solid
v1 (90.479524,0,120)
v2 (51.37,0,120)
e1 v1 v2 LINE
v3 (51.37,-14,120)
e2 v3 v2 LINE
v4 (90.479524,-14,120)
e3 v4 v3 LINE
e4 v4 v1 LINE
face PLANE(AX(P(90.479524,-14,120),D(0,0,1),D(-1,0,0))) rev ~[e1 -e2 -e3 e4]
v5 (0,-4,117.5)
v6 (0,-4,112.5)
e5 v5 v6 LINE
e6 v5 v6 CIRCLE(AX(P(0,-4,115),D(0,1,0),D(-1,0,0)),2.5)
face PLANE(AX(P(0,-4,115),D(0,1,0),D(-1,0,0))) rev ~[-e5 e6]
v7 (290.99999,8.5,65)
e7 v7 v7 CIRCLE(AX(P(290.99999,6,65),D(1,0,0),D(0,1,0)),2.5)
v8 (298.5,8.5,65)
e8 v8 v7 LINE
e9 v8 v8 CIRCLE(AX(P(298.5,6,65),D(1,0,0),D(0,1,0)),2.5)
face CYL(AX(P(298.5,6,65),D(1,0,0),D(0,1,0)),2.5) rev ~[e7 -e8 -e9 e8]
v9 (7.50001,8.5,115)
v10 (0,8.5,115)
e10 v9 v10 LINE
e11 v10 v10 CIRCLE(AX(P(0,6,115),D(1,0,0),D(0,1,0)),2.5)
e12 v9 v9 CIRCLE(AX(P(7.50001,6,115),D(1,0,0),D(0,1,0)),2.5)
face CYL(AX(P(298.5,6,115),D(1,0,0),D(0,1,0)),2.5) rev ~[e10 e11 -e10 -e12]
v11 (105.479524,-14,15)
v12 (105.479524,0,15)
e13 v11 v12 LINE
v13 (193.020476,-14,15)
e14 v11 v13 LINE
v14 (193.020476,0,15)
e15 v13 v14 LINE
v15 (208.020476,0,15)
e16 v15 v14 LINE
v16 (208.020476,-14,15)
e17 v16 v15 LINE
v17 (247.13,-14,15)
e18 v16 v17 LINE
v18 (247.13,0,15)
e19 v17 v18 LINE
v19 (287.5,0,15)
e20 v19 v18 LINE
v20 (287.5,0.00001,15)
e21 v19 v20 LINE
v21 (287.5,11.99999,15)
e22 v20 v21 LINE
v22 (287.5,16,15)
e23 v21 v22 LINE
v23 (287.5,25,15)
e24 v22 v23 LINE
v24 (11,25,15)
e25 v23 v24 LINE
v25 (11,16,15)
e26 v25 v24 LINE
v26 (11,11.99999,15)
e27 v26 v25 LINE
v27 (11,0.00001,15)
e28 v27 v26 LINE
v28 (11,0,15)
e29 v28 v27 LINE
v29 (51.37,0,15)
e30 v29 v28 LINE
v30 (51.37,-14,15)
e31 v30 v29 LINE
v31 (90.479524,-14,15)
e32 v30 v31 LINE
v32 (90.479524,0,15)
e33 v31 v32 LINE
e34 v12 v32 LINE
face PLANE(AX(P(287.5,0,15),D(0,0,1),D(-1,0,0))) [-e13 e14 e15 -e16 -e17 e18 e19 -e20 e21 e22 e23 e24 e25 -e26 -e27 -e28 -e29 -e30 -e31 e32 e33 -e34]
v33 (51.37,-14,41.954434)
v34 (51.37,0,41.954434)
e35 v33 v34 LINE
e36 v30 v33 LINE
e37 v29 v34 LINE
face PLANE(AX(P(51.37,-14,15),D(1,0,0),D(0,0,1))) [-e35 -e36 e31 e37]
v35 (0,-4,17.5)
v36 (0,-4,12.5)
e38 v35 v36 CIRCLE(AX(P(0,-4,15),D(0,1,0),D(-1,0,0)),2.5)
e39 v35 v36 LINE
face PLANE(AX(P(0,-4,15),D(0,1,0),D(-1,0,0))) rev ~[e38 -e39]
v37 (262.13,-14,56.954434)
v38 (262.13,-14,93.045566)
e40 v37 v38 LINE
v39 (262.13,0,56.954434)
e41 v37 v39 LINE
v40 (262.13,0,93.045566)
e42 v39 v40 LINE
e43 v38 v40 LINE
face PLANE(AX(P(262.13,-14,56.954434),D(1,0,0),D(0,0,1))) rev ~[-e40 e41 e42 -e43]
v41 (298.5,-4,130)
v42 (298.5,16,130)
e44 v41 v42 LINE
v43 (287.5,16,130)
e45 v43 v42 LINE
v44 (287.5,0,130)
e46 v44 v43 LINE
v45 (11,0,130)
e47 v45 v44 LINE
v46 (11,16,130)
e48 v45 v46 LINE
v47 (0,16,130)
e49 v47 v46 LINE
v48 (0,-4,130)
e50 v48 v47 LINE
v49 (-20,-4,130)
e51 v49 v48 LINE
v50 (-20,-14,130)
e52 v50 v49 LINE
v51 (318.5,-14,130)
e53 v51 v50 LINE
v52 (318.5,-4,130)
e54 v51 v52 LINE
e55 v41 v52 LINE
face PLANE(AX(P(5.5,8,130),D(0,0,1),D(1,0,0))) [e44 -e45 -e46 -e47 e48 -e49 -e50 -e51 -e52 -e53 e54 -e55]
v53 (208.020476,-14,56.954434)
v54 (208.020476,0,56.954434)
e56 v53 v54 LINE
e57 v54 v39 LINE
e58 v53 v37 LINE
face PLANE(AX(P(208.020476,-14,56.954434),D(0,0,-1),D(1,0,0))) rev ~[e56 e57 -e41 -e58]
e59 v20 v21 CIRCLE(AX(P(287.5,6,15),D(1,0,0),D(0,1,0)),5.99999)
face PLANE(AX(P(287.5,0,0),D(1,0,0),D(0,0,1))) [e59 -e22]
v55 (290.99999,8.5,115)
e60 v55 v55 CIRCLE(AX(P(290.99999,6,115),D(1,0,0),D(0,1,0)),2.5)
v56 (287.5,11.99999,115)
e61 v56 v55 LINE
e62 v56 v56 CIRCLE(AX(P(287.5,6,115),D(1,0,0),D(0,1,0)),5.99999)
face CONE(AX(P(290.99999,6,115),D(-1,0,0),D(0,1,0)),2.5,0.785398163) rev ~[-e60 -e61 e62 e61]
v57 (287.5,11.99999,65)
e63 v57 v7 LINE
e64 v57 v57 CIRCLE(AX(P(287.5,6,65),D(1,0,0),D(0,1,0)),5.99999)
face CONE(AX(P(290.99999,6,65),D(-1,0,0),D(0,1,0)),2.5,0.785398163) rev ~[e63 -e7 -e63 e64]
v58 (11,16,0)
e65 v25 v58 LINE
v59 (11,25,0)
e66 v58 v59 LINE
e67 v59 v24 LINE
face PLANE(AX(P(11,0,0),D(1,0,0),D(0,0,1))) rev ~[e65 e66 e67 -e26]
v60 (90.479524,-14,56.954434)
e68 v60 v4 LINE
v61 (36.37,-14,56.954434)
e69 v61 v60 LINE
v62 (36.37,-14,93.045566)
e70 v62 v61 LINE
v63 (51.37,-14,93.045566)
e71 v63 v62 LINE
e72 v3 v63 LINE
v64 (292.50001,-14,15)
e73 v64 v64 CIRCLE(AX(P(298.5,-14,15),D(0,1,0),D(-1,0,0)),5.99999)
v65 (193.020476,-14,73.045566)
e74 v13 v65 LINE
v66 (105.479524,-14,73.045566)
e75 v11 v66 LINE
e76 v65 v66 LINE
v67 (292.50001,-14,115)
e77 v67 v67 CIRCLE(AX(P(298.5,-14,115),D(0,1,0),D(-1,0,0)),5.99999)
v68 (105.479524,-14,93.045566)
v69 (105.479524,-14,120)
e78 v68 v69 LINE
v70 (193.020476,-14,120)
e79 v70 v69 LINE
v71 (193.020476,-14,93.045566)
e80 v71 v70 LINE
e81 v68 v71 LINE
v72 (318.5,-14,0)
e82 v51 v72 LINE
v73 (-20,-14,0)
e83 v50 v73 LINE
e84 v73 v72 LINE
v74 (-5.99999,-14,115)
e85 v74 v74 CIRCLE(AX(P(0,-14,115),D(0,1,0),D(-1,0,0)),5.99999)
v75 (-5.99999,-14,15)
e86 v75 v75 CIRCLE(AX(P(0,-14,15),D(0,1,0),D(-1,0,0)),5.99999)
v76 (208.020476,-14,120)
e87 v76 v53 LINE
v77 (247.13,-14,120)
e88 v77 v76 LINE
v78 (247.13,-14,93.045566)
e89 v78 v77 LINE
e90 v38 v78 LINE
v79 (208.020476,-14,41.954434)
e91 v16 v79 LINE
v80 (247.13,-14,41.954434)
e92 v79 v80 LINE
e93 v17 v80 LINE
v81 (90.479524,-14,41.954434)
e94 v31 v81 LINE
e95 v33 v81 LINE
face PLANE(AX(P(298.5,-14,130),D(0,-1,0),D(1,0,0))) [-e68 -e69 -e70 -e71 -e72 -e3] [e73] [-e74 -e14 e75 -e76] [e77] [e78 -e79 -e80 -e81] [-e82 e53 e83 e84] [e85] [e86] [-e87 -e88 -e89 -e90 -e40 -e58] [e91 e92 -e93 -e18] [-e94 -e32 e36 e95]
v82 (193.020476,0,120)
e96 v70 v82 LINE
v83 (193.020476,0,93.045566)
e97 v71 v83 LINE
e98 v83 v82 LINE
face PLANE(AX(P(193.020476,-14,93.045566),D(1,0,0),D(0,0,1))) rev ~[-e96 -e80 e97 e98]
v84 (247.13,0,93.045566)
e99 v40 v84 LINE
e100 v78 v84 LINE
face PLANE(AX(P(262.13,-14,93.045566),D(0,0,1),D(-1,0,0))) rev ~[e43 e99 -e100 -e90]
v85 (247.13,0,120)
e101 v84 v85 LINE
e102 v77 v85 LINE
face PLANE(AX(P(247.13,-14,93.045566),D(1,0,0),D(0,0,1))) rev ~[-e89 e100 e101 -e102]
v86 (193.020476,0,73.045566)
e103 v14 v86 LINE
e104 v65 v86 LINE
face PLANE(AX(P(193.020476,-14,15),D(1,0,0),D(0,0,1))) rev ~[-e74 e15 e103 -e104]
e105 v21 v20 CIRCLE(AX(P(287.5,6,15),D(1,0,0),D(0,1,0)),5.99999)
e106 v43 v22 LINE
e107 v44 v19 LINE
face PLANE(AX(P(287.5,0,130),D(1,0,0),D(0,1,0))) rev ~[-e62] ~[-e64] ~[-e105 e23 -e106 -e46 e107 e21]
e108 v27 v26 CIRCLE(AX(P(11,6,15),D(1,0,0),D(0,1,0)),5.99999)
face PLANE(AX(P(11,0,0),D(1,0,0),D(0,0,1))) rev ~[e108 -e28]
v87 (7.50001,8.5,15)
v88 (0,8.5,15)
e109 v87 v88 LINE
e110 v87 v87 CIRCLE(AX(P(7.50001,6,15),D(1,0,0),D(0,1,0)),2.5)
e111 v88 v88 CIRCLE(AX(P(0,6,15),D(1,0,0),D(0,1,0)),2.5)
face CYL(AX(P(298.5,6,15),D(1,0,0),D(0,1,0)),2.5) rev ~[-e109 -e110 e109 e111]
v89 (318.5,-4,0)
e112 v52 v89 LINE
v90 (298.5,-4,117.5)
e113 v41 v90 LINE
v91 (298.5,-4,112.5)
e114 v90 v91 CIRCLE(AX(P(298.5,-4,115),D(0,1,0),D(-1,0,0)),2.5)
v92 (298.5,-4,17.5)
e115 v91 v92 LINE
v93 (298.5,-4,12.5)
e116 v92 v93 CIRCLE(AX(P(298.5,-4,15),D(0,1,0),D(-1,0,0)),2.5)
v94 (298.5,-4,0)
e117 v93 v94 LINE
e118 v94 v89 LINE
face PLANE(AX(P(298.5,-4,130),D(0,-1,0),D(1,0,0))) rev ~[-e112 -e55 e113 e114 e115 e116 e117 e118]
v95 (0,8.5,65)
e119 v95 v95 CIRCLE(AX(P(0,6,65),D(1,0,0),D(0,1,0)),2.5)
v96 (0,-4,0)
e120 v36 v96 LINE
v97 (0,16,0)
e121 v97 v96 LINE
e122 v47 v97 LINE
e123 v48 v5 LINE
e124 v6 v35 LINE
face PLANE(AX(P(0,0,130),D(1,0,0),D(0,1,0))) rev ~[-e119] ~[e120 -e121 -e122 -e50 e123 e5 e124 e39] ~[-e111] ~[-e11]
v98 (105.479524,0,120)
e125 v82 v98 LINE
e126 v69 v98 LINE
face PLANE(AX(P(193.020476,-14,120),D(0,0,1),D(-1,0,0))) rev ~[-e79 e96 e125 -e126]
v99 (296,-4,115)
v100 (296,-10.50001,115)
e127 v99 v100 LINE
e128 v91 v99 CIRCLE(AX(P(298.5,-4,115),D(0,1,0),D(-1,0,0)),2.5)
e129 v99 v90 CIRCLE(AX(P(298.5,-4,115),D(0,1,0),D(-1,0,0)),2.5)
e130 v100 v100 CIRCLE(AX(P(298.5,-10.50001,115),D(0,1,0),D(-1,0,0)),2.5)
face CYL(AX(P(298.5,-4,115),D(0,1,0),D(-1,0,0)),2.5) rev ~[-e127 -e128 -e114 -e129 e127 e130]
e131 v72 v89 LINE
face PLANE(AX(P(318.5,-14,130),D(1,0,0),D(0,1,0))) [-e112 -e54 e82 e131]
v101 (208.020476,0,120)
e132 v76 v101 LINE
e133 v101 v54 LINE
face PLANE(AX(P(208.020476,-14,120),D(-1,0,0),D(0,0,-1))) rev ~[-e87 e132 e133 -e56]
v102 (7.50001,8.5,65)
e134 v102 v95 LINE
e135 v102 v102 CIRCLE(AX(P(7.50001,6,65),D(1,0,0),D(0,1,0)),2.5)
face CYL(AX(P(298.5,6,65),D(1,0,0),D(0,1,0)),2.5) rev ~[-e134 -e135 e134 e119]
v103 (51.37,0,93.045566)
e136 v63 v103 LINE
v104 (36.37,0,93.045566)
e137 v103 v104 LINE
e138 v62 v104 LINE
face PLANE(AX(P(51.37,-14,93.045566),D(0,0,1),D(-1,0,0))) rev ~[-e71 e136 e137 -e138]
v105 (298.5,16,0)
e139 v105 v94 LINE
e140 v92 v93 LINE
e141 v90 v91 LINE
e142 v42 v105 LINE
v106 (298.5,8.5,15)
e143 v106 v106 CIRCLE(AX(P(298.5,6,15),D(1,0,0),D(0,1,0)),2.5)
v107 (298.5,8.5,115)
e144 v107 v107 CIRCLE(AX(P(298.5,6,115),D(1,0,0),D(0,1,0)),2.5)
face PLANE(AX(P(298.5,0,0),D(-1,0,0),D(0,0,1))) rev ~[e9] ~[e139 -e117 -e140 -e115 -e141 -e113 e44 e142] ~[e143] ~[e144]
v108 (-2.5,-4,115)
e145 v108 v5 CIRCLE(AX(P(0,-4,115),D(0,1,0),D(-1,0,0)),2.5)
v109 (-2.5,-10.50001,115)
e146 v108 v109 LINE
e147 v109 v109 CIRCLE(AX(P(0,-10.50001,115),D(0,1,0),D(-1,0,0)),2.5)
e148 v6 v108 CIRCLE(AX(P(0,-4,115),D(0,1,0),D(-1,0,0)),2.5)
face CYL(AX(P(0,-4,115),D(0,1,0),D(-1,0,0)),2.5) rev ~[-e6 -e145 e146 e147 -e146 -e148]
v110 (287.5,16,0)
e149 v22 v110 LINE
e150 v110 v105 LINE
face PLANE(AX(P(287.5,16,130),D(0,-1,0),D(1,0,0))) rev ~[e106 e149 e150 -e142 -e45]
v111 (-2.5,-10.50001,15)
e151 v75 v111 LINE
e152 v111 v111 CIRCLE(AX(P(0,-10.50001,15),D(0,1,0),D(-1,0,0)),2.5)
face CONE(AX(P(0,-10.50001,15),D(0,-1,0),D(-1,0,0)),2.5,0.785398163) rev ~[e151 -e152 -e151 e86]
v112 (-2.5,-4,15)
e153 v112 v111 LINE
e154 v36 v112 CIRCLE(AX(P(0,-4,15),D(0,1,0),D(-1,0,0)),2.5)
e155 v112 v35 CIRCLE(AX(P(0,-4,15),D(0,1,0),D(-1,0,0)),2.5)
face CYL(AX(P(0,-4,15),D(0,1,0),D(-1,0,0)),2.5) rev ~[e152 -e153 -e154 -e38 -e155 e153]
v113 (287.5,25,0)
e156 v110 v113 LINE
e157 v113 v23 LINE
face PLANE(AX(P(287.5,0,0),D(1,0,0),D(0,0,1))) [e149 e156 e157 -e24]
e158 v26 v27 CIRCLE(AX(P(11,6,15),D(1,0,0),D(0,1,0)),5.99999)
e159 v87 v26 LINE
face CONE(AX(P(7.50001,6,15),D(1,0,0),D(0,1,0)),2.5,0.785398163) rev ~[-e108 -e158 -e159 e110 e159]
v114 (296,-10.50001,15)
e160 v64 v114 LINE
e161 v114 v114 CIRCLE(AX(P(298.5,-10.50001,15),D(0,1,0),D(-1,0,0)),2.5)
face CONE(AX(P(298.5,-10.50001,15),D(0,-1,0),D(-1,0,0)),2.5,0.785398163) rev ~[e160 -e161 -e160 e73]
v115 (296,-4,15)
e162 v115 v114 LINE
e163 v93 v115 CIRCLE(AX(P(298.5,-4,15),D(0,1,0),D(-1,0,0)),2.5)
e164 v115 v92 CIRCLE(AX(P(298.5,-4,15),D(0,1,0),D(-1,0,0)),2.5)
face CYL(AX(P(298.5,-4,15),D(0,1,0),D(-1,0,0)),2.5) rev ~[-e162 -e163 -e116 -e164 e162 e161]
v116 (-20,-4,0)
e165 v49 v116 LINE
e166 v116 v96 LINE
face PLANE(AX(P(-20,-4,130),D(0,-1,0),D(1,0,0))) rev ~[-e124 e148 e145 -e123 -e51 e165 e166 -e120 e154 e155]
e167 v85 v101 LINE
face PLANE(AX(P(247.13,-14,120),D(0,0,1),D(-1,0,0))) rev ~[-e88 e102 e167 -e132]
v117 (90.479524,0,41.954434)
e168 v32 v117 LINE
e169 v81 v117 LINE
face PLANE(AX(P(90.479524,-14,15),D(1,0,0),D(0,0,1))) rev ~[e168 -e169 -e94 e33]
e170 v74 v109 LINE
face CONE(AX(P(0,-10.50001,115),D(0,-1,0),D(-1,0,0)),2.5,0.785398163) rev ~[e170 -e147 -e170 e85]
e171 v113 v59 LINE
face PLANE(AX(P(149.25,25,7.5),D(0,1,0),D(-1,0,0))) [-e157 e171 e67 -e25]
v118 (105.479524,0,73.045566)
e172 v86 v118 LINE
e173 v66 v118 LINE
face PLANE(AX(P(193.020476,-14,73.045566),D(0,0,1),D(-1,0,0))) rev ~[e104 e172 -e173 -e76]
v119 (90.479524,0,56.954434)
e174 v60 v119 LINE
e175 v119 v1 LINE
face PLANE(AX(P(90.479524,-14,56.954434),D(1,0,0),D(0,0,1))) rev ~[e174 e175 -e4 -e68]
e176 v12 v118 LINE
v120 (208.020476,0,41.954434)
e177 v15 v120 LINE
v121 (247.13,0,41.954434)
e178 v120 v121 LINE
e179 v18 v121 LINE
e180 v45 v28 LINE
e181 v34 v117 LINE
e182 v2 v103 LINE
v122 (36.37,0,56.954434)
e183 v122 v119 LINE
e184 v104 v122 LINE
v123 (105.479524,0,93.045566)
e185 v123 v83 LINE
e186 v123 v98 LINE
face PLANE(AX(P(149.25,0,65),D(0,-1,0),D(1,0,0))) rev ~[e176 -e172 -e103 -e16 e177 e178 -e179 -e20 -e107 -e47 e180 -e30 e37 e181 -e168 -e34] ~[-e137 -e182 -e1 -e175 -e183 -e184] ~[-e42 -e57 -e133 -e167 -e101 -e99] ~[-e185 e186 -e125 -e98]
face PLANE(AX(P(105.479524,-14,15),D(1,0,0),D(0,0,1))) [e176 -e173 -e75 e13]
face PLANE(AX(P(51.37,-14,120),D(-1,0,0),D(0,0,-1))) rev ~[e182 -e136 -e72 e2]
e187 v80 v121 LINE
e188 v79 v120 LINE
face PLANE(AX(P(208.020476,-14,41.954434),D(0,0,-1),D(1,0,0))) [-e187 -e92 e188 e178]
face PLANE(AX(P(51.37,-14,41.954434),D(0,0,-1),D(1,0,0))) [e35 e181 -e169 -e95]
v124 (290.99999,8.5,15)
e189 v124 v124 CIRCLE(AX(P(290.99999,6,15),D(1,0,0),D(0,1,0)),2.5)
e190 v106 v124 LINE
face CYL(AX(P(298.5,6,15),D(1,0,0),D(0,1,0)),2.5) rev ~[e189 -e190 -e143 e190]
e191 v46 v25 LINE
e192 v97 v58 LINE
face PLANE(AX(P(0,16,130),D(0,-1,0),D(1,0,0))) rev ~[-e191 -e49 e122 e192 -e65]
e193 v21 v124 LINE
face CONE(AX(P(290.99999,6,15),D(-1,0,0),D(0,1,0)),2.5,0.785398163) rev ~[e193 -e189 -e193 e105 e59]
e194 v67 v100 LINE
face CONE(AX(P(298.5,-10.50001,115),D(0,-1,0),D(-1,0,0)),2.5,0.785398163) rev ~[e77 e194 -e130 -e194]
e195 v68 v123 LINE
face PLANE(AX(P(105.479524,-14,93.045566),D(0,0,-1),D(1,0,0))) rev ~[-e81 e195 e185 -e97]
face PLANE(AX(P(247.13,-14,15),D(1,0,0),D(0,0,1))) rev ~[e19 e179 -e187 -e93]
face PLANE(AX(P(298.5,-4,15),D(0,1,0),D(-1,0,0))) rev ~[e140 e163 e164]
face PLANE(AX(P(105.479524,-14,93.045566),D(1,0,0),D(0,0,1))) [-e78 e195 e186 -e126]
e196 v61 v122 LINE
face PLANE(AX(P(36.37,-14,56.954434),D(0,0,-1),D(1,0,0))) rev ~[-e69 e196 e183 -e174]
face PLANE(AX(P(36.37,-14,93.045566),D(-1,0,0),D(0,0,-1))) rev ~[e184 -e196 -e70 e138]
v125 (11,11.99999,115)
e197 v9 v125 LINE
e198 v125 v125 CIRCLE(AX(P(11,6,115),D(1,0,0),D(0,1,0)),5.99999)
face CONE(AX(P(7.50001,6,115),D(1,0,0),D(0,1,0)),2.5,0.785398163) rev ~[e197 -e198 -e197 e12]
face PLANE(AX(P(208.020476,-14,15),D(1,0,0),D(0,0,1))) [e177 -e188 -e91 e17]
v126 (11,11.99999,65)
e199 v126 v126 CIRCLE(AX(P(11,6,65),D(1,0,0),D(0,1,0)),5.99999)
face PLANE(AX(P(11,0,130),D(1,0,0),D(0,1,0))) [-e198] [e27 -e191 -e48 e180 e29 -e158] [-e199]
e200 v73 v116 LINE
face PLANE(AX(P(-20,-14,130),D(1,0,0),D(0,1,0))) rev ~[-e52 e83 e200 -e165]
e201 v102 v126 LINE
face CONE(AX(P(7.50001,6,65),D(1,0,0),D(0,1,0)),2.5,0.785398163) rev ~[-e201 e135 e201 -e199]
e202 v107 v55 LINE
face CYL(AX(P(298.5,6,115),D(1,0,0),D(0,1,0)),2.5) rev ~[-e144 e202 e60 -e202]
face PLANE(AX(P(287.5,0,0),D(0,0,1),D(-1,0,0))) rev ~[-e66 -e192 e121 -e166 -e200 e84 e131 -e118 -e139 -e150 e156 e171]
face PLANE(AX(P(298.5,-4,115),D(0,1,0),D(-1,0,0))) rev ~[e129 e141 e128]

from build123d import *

# Parameters (mm, degrees)
F0_W      = 298.5
F0_H      = 130
F1_DEPTH  = 14
F2_W      = 20
F2_H      = 10
F3_DEPTH  = 130
F4_W      = 11
F4_H      = 16
F5_DEPTH  = 130
F6_W      = 39.1095238095
F6_H      = 26.9544340008
F6_W_2    = 43.7704761905
F6_H_2    = 58.0455659992
F7_DEPTH  = 25
F8_R      = 2.5
F9_DEPTH  = 25
F10_R     = 2.5
F11_DEPTH = 318.501
F12_SIZE  = 3.49999
F14_W     = 276.5
F14_H     = 15
F13_DEPTH = 25


# Not quite as in the source:
# - a fillet or chamfer is up to 0.001 mm smaller than in the source, because OpenCascade refuses the exact size
# - a feature names something its author has since deleted; it is built from what else it names


with BuildPart() as f1:
    # F0 (on Front) → F1 (new body)
    with BuildSketch(Plane.XZ):
        with Locations((149.25, 65)):
            Rectangle(F0_W, F0_H)
    extrude(amount=F1_DEPTH)

    # F2 (on face) → F3 (join, through all)
    with BuildSketch(Plane.XY.offset(130)):
        with Locations((308.5, -9)):
            Rectangle(F2_W, F2_H)
        with Locations((-10, -9)):
            Rectangle(F2_W, F2_H)
    extrude(amount=-F3_DEPTH)

    # F4 (on face) → F5 (join, through all)
    with BuildSketch(Plane.XY.offset(130)):
        with Locations((5.5, 8)):
            Rectangle(F4_W, F4_H)
        with Locations((293, 8)):
            Rectangle(F4_W, F4_H)
    extrude(amount=-F5_DEPTH)

    # F6 (on face) → F7 (cut)
    with BuildSketch(Plane.XZ.offset(14)):
        Polygon((51.37, 120), (51.37, 93.0455659992), (36.37, 93.0455659992), (36.3699999999, 56.9544340008), (90.4795238095, 56.9544340008), (90.4795238095, 120), align=None)
        with Locations((70.9247619048, 28.4772170004)):
            Rectangle(F6_W, F6_H)
        with Locations((127.3647619048, 44.0227829996)):
            Rectangle(F6_W_2, F6_H_2)
        with Locations((171.1352380952, 44.0227829996)):
            Rectangle(F6_W_2, F6_H_2)
        with Locations((127.3647619048, 106.5227829996)):
            Rectangle(F6_W_2, F6_H)
        with Locations((171.1352380952, 106.5227829996)):
            Rectangle(F6_W_2, F6_H)
        Polygon((247.1300000001, 120), (208.0204761905, 120), (208.0204761905, 56.9544340008), (262.13, 56.9544340008), (262.13, 93.0455659992), (247.13, 93.0455659992), align=None)
        with Locations((227.5752380952, 28.4772170004)):
            Rectangle(F6_W, F6_H)
    extrude(amount=-F7_DEPTH, mode=Mode.SUBTRACT)

    # F8 (on face) → F9 (cut)
    with BuildSketch(Plane(origin=(0, -4, 0), x_dir=(-1, 0, 0), z_dir=(0, 1, 0))):
        with Locations((-298.5, 115)):
            Circle(F8_R)
        with Locations((-298.5, 15)):
            Circle(F8_R)
        with Locations((0, 115)):
            Circle(F8_R)
        with Locations((0, 15)):
            Circle(F8_R)
    extrude(amount=-F9_DEPTH, mode=Mode.SUBTRACT)

    # F10 (on face) → F11 (cut, through all)
    with BuildSketch(Plane.YZ.offset(298.5)):
        with Locations((6, 115)):
            Circle(F10_R)
        with Locations((6, 15)):
            Circle(F10_R)
        with Locations((6, 65)):
            Circle(F10_R)
    extrude(amount=-F11_DEPTH, mode=Mode.SUBTRACT)

    # F12 (size 3.5 in the source; OpenCascade refuses exactly that, so slightly less here)
    f12_edges = [f1.edges().sort_by_distance(p)[0] for p in [
        (301, -14, 115),
        (301, -14, 15),
        (2.5, -14, 115),
        (2.5, -14, 15),
        (287.5, 3.5, 115),
        (287.5, 3.5, 65),
        (287.5, 3.5, 15),
        (11, 3.5, 115),
        (11, 3.5, 65),
        (11, 3.5, 15),
    ]]
    chamfer(f12_edges, length=F12_SIZE)

    # F14 (on face) → F13 (join)
    with BuildSketch(Plane(origin=(0, 0, 0), x_dir=(-1, 0, 0), z_dir=(0, 1, 0))):
        with Locations((-149.25, 7.5)):
            Rectangle(F14_W, F14_H)
    extrude(amount=F13_DEPTH)


solid = f1.part
